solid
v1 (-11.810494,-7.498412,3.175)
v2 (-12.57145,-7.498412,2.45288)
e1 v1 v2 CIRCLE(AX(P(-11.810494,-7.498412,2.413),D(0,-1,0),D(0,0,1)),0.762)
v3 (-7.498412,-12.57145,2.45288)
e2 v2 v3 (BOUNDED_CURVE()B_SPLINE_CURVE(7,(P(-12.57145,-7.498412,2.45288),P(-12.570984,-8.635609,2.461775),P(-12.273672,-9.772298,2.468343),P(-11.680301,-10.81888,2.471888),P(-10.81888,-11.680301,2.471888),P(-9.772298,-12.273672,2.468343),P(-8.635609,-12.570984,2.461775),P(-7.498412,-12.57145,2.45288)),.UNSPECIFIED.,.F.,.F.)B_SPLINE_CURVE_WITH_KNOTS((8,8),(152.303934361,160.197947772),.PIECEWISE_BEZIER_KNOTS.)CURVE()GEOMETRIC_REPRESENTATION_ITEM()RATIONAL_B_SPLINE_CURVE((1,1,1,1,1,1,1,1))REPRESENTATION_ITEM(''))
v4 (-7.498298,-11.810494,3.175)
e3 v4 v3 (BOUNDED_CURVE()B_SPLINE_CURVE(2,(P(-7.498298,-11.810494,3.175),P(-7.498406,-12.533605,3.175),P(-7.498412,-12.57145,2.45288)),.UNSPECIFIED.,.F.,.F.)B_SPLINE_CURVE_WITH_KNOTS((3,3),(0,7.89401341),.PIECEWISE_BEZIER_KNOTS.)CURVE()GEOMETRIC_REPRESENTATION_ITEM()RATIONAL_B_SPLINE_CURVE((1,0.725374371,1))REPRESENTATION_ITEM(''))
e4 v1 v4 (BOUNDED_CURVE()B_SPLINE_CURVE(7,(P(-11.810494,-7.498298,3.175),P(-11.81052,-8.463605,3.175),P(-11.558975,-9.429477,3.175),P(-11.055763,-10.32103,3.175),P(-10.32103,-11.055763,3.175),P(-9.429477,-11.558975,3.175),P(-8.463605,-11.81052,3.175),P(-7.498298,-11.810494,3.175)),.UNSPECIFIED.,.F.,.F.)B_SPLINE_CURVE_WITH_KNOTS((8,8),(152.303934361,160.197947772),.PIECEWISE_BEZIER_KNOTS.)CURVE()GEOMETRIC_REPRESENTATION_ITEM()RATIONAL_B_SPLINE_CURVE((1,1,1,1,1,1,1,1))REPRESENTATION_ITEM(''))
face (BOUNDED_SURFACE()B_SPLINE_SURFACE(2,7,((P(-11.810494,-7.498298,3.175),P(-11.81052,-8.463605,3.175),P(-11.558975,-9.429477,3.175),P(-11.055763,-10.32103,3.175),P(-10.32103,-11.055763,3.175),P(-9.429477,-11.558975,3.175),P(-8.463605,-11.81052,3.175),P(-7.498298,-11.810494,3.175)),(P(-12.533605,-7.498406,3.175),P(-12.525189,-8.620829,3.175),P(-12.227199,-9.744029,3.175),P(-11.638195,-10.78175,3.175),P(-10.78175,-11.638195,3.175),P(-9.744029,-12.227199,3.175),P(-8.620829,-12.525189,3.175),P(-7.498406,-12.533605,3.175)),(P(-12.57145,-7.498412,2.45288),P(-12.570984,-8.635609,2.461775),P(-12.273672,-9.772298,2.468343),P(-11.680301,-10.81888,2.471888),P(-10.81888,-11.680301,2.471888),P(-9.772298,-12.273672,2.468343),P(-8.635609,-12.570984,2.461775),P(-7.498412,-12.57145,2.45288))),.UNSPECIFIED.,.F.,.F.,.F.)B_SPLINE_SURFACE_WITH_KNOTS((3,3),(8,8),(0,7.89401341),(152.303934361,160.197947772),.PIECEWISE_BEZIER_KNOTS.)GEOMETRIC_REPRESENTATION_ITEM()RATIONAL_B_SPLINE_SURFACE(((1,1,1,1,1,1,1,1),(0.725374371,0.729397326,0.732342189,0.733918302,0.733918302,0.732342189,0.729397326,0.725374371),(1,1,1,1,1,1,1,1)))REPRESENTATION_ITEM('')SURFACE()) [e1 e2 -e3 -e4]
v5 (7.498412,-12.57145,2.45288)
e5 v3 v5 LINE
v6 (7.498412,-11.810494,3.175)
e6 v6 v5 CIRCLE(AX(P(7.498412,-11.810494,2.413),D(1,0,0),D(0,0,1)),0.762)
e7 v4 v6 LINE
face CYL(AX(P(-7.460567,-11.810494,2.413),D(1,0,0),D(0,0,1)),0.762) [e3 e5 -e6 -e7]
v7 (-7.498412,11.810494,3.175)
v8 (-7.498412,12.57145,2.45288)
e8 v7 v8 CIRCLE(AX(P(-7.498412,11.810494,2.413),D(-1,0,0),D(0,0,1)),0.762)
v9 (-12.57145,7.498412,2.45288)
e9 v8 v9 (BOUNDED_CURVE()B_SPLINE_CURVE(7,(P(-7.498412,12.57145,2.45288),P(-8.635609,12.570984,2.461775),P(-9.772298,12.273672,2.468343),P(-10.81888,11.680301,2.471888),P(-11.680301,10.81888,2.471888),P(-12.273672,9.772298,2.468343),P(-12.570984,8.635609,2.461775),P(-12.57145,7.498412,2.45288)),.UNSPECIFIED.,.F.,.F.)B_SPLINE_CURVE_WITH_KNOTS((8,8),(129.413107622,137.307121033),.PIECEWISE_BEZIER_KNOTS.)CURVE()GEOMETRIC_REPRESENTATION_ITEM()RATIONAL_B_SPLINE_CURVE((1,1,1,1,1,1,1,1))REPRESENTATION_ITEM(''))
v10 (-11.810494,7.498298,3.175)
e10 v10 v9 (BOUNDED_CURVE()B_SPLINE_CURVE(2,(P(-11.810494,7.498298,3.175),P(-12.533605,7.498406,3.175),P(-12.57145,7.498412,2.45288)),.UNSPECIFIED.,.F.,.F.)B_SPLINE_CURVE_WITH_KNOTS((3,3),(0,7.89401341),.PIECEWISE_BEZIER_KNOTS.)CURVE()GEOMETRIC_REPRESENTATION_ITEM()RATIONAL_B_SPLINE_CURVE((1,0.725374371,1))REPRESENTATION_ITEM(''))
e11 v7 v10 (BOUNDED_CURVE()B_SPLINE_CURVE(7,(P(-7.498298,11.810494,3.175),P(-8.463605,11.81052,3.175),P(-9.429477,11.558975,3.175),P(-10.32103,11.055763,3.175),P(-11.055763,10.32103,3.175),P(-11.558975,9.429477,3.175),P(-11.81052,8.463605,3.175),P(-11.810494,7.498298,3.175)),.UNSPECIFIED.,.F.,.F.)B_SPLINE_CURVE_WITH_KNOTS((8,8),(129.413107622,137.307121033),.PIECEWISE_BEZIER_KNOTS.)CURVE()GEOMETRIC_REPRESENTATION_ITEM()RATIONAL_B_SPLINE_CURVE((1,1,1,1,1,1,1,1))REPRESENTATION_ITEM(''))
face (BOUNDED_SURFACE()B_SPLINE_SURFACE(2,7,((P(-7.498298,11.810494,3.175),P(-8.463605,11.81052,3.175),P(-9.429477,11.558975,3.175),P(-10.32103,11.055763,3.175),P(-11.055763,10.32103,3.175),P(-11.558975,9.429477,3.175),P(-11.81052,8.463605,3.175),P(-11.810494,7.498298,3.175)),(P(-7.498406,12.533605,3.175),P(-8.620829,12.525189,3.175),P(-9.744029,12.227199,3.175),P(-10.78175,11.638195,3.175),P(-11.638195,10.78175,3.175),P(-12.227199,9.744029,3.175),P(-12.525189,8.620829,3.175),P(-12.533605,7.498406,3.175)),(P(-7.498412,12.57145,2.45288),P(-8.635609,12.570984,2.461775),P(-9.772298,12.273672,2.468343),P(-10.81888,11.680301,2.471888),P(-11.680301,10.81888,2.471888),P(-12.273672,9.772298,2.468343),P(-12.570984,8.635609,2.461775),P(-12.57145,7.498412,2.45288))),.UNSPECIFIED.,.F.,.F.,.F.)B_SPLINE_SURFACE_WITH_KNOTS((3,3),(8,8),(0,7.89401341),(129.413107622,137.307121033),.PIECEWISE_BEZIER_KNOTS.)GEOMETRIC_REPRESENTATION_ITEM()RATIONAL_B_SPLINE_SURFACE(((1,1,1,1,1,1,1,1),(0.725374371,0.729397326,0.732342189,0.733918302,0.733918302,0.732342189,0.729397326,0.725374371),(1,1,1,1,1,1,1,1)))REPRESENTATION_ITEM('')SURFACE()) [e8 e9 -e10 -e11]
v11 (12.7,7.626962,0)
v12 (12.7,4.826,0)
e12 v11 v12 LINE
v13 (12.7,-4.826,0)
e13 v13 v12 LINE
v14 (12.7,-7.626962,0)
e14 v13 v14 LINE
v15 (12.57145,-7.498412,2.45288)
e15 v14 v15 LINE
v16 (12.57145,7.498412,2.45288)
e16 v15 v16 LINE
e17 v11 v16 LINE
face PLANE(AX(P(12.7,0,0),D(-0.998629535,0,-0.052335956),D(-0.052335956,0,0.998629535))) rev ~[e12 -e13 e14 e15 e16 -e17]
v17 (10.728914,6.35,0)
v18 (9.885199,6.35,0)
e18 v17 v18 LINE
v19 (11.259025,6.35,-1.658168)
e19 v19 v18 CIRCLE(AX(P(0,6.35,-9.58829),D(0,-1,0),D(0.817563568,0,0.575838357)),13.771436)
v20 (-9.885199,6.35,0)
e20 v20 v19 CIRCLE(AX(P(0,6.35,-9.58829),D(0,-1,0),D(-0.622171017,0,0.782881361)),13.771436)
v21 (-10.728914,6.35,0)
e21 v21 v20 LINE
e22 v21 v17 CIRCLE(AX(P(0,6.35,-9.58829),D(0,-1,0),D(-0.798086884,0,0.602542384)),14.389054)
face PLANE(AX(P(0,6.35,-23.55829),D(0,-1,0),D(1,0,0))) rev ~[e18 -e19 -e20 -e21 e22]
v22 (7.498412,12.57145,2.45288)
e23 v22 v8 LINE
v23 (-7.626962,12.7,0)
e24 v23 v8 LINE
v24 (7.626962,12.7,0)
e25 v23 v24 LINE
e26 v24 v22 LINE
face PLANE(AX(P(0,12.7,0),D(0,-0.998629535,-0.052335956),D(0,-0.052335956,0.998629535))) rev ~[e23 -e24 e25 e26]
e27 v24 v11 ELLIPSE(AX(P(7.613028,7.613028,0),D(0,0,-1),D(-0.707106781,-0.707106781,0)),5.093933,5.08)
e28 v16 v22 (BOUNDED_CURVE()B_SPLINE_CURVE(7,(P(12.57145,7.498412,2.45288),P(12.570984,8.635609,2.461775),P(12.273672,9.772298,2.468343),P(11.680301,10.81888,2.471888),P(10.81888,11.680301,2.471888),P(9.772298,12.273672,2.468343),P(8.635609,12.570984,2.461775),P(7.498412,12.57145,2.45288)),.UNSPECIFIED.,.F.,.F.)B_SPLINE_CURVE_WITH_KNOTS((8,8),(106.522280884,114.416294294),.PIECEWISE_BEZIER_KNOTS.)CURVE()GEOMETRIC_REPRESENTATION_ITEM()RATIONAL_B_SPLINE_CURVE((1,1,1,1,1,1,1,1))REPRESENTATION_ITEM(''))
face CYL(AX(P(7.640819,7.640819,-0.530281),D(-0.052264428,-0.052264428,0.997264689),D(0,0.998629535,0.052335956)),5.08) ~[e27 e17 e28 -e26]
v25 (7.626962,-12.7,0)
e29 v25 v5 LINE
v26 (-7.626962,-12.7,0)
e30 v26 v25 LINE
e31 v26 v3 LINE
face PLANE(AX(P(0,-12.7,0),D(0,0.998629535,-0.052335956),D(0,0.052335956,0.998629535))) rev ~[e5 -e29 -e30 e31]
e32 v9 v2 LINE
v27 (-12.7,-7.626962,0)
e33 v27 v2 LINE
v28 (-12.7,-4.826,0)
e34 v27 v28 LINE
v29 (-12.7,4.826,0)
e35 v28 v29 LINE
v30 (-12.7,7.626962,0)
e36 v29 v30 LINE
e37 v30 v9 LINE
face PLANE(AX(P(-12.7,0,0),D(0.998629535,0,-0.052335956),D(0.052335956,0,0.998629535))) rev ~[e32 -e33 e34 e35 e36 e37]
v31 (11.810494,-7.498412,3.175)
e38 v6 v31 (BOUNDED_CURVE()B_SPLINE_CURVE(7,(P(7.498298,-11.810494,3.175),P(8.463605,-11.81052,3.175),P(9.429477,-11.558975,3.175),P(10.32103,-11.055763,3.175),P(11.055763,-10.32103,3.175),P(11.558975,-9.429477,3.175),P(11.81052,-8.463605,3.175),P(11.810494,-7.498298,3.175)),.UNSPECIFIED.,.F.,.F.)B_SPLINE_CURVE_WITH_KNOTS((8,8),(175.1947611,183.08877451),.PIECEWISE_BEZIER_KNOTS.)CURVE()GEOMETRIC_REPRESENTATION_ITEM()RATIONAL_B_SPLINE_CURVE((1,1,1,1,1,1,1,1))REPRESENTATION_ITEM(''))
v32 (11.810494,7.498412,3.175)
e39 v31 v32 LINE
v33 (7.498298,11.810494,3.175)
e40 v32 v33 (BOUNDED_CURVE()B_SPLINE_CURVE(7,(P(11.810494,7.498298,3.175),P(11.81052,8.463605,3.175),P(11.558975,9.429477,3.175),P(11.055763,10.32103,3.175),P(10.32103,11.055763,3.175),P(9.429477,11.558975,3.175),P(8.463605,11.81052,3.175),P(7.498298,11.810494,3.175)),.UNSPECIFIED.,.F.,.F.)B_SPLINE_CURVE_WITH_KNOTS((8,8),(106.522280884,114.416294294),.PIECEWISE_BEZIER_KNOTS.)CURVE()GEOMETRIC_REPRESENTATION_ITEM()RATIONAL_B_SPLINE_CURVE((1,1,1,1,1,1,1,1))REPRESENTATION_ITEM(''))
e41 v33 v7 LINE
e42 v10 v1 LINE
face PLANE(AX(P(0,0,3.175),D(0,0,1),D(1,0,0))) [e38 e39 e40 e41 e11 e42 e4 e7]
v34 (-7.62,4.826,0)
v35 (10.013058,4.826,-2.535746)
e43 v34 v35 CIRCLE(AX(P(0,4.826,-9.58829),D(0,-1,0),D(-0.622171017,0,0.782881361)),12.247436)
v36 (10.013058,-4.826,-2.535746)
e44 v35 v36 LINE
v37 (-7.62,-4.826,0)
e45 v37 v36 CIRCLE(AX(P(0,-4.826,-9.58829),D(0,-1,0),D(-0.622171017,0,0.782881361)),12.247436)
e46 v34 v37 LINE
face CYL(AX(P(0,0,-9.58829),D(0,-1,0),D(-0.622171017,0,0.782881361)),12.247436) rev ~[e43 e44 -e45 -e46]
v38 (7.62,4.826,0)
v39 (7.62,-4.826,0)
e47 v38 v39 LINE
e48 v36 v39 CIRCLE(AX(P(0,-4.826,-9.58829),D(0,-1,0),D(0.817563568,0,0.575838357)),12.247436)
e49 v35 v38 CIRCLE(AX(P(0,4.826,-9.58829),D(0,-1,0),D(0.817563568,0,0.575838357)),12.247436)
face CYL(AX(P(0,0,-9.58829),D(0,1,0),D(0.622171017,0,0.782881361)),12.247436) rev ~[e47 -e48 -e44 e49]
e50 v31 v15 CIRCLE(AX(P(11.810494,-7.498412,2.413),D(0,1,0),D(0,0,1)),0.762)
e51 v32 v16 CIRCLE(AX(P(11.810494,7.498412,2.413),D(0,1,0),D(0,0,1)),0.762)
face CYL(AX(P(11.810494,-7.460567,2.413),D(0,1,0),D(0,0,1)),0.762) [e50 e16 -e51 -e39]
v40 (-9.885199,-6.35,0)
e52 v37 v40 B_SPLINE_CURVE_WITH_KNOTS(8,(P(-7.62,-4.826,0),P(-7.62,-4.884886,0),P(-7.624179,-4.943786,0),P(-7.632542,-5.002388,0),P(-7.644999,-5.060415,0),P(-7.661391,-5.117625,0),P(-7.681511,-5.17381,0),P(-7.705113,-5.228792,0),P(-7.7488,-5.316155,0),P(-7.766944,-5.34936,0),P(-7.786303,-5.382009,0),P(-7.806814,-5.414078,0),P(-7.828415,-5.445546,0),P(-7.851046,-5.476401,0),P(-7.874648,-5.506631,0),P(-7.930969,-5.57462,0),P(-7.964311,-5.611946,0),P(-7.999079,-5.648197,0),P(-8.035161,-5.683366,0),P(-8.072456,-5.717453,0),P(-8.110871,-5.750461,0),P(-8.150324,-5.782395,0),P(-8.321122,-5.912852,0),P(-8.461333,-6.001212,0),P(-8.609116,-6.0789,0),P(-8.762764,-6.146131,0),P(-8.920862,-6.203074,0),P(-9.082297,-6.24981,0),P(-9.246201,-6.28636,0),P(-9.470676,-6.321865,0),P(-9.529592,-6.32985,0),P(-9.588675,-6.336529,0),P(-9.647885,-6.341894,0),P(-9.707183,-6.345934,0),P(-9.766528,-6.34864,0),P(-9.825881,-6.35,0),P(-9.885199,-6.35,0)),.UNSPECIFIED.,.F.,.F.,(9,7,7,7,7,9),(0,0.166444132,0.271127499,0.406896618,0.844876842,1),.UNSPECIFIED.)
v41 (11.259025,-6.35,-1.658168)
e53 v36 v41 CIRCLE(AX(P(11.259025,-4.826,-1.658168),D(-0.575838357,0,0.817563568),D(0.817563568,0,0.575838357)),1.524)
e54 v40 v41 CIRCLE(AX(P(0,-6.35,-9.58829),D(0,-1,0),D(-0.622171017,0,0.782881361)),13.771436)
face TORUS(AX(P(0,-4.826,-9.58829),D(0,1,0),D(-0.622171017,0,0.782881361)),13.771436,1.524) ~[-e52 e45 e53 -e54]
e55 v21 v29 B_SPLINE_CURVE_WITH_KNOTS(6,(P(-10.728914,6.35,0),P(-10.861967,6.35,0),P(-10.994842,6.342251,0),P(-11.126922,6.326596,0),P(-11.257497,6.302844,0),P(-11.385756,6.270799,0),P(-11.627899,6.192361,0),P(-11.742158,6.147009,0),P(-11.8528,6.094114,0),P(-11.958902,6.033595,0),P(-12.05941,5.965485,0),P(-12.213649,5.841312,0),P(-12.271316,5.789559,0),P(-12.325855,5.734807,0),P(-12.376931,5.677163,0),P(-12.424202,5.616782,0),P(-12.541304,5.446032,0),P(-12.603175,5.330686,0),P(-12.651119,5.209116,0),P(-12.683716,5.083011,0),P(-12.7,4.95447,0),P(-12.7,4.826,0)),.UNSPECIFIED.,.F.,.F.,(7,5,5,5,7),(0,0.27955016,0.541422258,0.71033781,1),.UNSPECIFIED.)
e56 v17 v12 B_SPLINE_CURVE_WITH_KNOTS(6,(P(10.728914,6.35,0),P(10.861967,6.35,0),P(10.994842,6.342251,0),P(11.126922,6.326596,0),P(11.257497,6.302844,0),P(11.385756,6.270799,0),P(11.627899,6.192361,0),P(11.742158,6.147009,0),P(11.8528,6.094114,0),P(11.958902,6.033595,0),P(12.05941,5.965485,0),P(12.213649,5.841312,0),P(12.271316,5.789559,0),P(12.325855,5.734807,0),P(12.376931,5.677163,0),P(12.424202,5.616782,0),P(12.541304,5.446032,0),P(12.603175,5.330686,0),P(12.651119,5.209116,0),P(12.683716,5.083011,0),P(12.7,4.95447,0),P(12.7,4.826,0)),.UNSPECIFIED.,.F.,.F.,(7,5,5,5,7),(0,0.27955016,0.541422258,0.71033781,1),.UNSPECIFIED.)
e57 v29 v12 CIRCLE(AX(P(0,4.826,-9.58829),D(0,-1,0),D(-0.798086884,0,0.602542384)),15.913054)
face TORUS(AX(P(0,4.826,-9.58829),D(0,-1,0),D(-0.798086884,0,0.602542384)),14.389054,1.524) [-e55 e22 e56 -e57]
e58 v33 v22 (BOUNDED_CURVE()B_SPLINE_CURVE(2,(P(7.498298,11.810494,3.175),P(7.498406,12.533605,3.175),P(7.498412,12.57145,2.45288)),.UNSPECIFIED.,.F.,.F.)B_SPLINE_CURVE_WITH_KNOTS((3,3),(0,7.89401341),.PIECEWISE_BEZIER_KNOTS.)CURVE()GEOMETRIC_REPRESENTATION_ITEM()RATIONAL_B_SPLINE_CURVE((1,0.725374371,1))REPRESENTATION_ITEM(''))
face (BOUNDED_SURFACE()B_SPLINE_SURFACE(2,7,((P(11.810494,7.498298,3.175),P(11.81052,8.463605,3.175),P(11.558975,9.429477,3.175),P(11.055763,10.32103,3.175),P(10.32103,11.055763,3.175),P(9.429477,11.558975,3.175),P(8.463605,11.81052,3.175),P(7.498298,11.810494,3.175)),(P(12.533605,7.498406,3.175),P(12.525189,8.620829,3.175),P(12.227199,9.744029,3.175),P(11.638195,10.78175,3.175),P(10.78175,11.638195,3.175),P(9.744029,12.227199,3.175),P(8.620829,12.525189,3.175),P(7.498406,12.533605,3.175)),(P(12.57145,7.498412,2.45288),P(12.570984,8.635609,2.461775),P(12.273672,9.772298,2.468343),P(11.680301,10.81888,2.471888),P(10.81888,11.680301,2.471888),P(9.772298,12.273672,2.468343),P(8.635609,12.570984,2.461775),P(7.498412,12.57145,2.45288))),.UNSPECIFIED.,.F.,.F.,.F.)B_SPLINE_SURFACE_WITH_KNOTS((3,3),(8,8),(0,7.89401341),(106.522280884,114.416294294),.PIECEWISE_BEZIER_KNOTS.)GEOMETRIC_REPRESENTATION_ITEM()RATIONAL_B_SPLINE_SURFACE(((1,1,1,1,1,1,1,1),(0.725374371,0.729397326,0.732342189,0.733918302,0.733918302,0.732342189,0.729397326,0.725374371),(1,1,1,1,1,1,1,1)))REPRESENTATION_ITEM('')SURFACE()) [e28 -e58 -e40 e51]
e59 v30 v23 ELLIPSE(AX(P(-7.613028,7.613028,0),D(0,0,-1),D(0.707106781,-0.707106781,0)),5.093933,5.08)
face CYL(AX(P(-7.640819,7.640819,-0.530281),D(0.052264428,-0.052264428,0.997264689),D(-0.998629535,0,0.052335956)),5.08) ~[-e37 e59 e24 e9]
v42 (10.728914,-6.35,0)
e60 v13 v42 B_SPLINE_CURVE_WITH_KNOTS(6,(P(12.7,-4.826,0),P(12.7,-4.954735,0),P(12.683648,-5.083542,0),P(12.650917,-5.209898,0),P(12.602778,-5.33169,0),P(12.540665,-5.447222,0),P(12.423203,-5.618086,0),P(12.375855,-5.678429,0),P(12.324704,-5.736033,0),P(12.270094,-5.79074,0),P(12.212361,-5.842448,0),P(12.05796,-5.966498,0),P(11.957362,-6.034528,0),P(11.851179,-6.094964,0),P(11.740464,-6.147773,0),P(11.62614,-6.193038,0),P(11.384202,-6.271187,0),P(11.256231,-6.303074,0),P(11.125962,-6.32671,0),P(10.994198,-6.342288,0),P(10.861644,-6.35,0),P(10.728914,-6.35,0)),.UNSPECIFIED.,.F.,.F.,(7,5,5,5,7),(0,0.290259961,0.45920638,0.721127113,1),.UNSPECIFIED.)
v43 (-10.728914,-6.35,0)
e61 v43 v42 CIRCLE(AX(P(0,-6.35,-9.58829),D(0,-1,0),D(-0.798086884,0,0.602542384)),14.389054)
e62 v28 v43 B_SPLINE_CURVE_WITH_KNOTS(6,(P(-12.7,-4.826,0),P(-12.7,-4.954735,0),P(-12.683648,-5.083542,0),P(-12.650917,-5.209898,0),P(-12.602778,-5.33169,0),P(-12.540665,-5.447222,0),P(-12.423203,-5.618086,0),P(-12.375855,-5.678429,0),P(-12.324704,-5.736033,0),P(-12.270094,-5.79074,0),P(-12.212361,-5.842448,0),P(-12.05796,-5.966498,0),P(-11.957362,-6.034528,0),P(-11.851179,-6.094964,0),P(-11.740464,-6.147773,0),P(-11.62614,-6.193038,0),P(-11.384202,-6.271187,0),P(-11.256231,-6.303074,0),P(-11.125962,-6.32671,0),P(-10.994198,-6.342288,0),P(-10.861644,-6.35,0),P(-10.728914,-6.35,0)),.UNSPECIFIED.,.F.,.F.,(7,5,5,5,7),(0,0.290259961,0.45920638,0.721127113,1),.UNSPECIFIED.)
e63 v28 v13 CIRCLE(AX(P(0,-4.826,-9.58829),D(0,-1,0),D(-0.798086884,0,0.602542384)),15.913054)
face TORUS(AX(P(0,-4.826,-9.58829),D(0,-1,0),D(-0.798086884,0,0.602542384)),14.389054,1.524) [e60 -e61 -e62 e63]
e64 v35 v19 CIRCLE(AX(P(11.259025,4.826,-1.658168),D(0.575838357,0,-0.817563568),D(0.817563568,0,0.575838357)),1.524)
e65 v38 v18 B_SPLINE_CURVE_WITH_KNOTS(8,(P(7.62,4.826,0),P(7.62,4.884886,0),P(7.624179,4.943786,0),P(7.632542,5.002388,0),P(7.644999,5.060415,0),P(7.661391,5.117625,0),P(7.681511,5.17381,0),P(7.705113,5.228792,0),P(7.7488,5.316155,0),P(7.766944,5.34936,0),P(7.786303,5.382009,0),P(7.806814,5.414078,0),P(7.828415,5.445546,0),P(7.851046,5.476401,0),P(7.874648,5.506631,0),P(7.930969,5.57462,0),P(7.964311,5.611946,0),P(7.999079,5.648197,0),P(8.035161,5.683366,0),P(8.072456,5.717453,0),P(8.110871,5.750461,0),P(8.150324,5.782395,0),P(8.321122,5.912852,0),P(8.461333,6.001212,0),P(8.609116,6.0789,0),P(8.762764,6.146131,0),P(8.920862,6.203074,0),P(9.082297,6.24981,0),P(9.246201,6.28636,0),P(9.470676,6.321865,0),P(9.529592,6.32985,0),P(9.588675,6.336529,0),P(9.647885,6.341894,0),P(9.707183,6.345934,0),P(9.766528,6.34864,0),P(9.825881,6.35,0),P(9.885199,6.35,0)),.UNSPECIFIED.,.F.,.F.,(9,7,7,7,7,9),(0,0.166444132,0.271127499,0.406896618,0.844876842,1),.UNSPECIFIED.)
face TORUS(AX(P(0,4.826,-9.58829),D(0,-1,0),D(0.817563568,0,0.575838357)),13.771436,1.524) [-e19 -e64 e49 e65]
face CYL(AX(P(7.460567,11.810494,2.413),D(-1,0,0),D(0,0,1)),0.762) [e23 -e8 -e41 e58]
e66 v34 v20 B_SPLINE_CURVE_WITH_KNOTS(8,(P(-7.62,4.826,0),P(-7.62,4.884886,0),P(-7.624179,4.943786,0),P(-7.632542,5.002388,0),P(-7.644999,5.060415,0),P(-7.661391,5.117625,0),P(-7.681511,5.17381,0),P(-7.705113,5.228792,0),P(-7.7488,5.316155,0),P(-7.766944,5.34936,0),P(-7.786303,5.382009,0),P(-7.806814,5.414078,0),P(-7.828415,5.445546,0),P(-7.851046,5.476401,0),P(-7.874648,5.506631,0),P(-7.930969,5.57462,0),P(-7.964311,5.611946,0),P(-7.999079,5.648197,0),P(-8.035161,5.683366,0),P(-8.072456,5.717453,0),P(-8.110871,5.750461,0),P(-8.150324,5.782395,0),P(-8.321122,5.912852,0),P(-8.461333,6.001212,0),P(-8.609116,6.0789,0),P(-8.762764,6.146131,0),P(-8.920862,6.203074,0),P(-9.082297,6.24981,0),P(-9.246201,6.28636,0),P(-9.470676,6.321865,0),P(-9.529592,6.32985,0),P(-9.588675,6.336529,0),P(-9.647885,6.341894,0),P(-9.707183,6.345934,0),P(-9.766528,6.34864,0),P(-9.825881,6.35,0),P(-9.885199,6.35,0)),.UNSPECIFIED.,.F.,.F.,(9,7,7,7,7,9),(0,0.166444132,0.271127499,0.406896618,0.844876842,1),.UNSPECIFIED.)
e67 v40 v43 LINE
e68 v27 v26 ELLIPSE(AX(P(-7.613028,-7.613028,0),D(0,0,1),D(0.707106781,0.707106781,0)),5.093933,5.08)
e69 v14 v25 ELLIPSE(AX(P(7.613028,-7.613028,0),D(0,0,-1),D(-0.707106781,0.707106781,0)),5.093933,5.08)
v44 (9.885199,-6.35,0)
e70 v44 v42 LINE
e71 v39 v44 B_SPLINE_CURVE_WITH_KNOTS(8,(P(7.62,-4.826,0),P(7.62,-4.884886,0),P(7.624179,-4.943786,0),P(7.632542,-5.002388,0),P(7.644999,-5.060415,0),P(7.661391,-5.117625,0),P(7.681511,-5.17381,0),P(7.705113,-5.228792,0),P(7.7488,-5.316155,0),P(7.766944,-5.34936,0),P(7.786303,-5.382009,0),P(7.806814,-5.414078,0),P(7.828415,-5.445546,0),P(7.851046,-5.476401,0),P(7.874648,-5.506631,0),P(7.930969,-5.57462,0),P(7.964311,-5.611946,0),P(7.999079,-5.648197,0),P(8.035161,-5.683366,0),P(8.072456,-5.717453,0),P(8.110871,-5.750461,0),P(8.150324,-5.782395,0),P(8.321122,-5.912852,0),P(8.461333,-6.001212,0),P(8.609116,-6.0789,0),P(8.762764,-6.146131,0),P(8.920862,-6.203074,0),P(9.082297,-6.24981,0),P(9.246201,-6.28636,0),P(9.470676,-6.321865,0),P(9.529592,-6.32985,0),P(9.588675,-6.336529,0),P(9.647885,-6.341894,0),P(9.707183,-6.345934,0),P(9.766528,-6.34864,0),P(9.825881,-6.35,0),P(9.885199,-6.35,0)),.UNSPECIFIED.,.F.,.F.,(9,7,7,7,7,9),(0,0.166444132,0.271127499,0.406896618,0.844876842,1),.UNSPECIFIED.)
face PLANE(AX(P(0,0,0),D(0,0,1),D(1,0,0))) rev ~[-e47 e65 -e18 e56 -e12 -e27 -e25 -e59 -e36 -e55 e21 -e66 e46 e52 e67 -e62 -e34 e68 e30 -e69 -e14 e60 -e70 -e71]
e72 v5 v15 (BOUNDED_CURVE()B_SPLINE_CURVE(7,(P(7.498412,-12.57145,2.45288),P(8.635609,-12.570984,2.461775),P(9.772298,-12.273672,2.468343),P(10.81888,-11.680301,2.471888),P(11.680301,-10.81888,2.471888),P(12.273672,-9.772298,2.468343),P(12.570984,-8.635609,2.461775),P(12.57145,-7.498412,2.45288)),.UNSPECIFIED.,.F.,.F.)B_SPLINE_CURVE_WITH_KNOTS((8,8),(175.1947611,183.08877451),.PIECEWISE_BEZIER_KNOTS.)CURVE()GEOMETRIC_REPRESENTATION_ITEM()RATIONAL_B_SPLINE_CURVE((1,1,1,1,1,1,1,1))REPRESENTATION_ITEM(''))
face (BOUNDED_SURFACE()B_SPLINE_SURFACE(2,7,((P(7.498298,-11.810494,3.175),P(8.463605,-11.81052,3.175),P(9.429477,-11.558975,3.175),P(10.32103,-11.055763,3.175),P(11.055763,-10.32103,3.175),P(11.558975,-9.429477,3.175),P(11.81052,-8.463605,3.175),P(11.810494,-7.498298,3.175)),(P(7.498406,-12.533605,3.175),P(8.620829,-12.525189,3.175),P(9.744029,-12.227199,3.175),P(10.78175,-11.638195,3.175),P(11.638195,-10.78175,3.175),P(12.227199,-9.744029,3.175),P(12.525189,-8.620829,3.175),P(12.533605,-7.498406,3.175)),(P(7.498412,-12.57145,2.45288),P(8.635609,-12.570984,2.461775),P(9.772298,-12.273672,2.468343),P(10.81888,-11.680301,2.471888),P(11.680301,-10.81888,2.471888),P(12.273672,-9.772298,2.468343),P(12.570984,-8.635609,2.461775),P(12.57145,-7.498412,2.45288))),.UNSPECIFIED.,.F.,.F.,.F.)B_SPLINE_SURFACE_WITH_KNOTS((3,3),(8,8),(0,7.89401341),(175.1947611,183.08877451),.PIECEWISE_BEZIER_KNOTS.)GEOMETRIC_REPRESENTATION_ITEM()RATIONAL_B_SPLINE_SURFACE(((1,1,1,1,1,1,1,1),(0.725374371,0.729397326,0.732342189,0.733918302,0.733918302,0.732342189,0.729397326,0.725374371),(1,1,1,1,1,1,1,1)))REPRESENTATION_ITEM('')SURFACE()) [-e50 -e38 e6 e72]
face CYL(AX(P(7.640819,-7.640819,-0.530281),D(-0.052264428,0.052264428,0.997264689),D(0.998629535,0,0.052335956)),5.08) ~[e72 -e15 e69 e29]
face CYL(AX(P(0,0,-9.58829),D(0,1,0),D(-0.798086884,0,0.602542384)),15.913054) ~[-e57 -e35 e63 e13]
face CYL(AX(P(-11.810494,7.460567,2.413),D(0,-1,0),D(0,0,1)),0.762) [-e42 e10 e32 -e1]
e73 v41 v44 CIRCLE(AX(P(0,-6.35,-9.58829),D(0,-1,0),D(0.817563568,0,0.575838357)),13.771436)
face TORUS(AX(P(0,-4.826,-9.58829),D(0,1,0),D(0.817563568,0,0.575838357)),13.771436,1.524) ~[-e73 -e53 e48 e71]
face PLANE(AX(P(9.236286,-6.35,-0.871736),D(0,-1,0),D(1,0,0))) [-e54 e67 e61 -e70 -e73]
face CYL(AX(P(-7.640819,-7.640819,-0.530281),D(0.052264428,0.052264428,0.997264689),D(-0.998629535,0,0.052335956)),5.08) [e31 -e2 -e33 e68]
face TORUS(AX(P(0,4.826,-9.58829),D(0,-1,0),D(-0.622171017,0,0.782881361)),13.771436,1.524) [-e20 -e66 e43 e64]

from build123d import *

# Parameters (mm, degrees)
F0_W          = 25.4
F0_H          = 25.4
F1_DEPTH      = 3.175
F1_TAPER      = 3
F3_W          = 5.08
F3_H          = 12.7
F6_DEPTH      = 6.35
F6_DEPTH_BACK = 6.35
F7_R          = 5.08
F8_R          = 1.524
F9_R          = 0.762


with BuildPart() as f1:
    # F0 (on Top) → F1 (new body)
    with BuildSketch(Plane.XY):
        Rectangle(F0_W, F0_H)
    extrude(amount=F1_DEPTH, taper=F1_TAPER)

    # F4: sweep along a path in F2
    with BuildLine(Plane.XZ) as f4_path:
        ThreePointArc((-10.16, 0), (0, -23.5582897328), (10.16, 0))
    # F3 (on face) → F4 (sweep)
    with BuildSketch(Plane(origin=(0, 0, 0), x_dir=(1, 0, 0), z_dir=(0, 0, -1))):
        with Locations((-10.16, 0)):
            Rectangle(F3_W, F3_H)
    sweep(path=f4_path.line)

    # F5 (on Front) → F6 (join, two sides)
    with BuildSketch(Plane.XZ) as f6_sk:
        with BuildLine():
            Line((10.0130578512, -2.535746045), (10.16, 0))
            Line((10.16, 0), (7.62, 0))
            ThreePointArc((7.62, 0), (8.9072265211, -1.1822790439), (10.0130578512, -2.535746045))
        make_face()
    extrude(amount=F6_DEPTH)
    extrude(f6_sk.sketch, amount=-F6_DEPTH_BACK)

    # F7
    f7_edges = [f1.edges().sort_by_distance(p)[0] for p in [
        (12.616803, -12.616803, 1.5875),
        (12.616803, 12.616803, 1.5875),
        (-12.616803, 12.616803, 1.5875),
        (-12.616803, -12.616803, 1.5875),
    ]]
    fillet(f7_edges, radius=F7_R)

    # F8
    f8_edges = [f1.edges().sort_by_distance(p)[0] for p in [
        (-1.743325, -6.35, -21.711017),
        (8.907227, -6.35, -1.182279),
        (-1.743325, 6.35, -21.711017),
        (0, -6.35, -25.501344),
        (0, 6.35, -25.501344),
        (8.907227, 6.35, -1.182279),
    ]]
    fillet(f8_edges, radius=F8_R)

    # F9
    f9_edges = [f1.edges().sort_by_distance(p)[0] for p in [
        (12.533605, 0, 3.175),
        (11.048589, -11.048589, 3.175),
        (11.048589, 11.048589, 3.175),
        (0, -12.533605, 3.175),
        (0, 12.533605, 3.175),
        (-11.048589, -11.048589, 3.175),
        (-11.048589, 11.048589, 3.175),
        (-12.533605, 0, 3.175),
    ]]
    fillet(f9_edges, radius=F9_R)


solid = f1.part
